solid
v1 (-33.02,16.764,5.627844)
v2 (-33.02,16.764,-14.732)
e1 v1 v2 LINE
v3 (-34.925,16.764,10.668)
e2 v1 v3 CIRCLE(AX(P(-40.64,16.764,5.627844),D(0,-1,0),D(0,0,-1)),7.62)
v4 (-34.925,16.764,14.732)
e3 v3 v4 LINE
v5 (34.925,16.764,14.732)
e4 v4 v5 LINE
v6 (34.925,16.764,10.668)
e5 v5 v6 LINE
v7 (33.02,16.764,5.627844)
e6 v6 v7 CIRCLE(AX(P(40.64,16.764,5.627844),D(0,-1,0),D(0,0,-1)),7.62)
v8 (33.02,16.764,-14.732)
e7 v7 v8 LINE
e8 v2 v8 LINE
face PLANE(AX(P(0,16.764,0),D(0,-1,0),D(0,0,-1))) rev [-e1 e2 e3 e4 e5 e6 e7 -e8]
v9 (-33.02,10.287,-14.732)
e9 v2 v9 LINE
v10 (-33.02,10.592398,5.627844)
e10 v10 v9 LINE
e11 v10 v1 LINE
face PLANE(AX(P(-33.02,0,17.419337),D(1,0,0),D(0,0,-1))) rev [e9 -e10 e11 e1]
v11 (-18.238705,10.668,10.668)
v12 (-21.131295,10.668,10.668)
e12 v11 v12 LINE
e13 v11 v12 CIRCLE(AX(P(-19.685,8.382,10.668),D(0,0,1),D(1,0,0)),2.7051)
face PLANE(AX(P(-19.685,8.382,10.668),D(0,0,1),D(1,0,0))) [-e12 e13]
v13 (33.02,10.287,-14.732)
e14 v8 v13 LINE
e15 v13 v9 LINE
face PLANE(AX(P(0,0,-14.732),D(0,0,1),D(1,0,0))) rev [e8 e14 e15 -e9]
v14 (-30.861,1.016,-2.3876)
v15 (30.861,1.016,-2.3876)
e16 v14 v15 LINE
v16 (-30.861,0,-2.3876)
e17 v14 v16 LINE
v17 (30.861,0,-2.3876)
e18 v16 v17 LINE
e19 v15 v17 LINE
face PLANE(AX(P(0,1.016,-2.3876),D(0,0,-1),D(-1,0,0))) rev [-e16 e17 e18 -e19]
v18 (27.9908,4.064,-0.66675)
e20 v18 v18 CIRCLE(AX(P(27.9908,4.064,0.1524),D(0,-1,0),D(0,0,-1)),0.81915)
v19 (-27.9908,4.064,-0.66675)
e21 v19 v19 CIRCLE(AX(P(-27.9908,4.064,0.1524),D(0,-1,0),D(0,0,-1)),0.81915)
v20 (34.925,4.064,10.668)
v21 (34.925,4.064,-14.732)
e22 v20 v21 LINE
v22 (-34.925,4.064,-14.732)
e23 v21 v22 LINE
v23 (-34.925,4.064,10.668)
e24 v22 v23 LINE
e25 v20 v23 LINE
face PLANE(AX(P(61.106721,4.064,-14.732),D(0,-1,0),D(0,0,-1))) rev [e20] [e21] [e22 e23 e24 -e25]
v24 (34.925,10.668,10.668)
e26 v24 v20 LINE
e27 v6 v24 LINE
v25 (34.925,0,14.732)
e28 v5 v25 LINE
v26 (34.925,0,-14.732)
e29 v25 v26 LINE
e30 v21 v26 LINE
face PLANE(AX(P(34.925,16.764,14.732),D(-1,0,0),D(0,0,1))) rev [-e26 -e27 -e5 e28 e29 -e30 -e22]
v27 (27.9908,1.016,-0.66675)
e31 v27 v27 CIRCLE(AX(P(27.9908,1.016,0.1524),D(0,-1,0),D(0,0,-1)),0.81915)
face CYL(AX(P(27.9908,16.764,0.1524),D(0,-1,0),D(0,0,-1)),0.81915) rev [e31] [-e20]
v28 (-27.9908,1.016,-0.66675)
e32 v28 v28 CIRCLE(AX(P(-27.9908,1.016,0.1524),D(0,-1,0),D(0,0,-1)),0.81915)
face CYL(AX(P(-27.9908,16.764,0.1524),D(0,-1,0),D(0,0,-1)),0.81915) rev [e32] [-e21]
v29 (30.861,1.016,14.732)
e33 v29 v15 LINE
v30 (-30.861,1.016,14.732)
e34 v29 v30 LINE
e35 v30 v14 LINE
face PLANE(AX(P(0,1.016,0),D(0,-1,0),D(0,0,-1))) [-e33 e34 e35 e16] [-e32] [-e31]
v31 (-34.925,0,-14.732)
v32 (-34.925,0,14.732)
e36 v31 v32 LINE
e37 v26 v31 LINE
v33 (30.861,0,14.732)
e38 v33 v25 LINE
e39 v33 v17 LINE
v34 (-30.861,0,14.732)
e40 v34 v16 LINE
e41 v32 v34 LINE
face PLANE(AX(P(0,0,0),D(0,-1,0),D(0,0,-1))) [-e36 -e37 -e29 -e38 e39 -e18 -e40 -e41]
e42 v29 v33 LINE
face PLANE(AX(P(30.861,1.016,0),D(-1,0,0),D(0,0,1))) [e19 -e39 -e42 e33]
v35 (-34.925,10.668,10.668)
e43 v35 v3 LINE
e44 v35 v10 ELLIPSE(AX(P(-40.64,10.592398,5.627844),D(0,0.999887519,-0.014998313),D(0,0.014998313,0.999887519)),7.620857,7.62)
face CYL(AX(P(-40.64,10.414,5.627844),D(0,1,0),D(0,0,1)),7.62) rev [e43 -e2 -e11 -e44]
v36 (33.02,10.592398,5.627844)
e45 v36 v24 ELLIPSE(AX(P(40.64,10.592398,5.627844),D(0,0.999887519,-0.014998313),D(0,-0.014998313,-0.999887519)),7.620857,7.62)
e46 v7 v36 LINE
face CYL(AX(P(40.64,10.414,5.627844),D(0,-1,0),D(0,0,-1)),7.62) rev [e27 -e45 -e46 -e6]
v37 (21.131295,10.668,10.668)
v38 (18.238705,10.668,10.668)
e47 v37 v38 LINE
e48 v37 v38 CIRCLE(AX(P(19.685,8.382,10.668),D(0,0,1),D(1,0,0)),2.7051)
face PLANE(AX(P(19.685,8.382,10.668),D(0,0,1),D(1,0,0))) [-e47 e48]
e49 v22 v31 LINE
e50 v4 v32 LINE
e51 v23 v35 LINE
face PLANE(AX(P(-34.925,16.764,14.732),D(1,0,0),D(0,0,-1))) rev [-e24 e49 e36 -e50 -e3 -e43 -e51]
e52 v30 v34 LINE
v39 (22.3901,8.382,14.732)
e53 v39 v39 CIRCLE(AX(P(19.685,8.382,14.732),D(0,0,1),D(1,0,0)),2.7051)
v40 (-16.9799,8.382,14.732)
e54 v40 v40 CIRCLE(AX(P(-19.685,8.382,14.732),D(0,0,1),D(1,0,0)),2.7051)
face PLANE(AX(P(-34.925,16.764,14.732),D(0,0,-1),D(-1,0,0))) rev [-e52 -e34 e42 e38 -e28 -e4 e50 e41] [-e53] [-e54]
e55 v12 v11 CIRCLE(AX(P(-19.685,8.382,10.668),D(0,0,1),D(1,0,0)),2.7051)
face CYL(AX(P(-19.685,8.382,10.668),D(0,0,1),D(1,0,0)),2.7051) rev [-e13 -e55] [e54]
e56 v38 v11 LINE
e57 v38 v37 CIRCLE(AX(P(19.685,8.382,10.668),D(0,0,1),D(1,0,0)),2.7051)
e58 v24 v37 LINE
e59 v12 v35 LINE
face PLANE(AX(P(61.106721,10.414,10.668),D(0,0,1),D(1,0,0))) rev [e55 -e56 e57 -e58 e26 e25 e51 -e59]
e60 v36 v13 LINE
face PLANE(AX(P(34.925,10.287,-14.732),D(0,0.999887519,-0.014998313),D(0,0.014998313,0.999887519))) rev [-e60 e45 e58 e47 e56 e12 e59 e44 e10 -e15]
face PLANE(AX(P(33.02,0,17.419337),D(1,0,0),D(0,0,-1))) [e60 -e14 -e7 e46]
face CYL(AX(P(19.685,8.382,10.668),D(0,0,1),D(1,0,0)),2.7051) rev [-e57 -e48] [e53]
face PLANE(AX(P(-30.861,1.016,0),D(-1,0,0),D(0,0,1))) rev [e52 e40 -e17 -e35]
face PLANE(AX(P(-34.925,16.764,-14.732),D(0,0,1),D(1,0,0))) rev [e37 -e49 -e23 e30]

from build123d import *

# Parameters (mm, degrees)
SKETCH1_W               = 69.85
SKETCH1_H               = 29.464
BOSS_EXTRUDE1_DEPTH     = 16.764
SKETCH2_W               = 25.4
SKETCH2_H               = 6.35
CUT_EXTRUDE1_DEPTH      = 69.85
SKETCH3_W               = 25.4
SKETCH3_H               = 6.35
CUT_EXTRUDE2_DEPTH      = 50.8
SKETCH5_W               = 61.722
SKETCH5_H               = 17.1196
CUT_EXTRUDE3_DEPTH      = 1.016
SKETCH5_3_R             = 0.81915
CUT_EXTRUDE4_DEPTH      = 42.446581825
SKETCH7_W               = 69.85
SKETCH7_H               = 7.62
BOSS_EXTRUDE2_DEPTH     = 25.4
CUT_EXTRUDE9_DEPTH      = 74.328616651
CUT_EXTRUDE9_DEPTH_BACK = 74.328616651
SKETCH13_R              = 2.7051
CUT_EXTRUDE12_DEPTH     = 4.064
SKETCH17_W              = 1.905
SKETCH17_H              = 6.477
CUT_EXTRUDE13_DEPTH     = 25.4
FILLET1_R               = 7.62


with BuildPart() as part:
    # Sketch1 → Boss-Extrude1 (new body)
    with BuildSketch(Plane(origin=(0, 0, 0), x_dir=(1, 0, 0), z_dir=(0, 1, 0))):
        Rectangle(SKETCH1_W, SKETCH1_H)
    extrude(amount=BOSS_EXTRUDE1_DEPTH)

    # Sketch2 → Cut-Extrude1 (cut)
    with BuildSketch(Plane.ZY.offset(34.925)):
        with Locations((-2.032, 7.239)):
            Rectangle(SKETCH2_W, SKETCH2_H)
    extrude(amount=-CUT_EXTRUDE1_DEPTH, mode=Mode.SUBTRACT)

    # Sketch3 → Cut-Extrude2 (cut)
    with BuildSketch(Plane.ZY.offset(34.925)):
        with Locations((-2.032, 13.589)):
            Rectangle(SKETCH3_W, SKETCH3_H)
    cut_extrude2 = extrude(amount=-CUT_EXTRUDE2_DEPTH, mode=Mode.SUBTRACT)

    # Mirror1: Cut-Extrude2 across plane
    add(cut_extrude2.mirror(Plane(origin=(0, 0, 0), x_dir=(0, 0, 1), z_dir=(1, 0, 0))), mode=Mode.SUBTRACT)

    # Sketch5 → Cut-Extrude3 (cut)
    with BuildSketch(Plane.XZ):
        with Locations((0, 6.1722)):
            Rectangle(SKETCH5_W, SKETCH5_H)
    extrude(amount=-CUT_EXTRUDE3_DEPTH, mode=Mode.SUBTRACT)

    # Sketch5<3> → Cut-Extrude4 (cut, through all)
    with BuildSketch(Plane.XZ):
        with Locations(Location((-27.9908, 0.1524, 0), (0, 0, 270))):
            Circle(SKETCH5_3_R)
        with Locations(Location((27.9908, 0.1524, 0), (0, 0, 270))):
            Circle(SKETCH5_3_R)
    extrude(amount=-CUT_EXTRUDE4_DEPTH, mode=Mode.SUBTRACT)

    # Sketch7 → Boss-Extrude2 (add)
    with BuildSketch(Plane(origin=(0, 0, 10.668), x_dir=(-1, 0, 0), z_dir=(0, 0, -1))):
        with Locations((0, 12.954)):
            Rectangle(SKETCH7_W, SKETCH7_H)
    extrude(amount=BOSS_EXTRUDE2_DEPTH)

    # Sketch8 → Cut-Extrude9 (cut, two sides: drawn at the far end of the back side and taken through both)
    with BuildSketch(Plane.ZY.offset(34.925).offset(-CUT_EXTRUDE9_DEPTH_BACK)):
        Polygon((-14.732, 10.287), (10.668, 10.668), (10.668, 9.144), (-14.732, 9.144), align=None)
    extrude(amount=CUT_EXTRUDE9_DEPTH + CUT_EXTRUDE9_DEPTH_BACK, mode=Mode.SUBTRACT)

    # Sketch13 → Cut-Extrude12 (cut)
    with BuildSketch(Plane.XY.offset(14.732)):
        with Locations((-19.685, 8.382)):
            Circle(SKETCH13_R)
        with Locations((19.685, 8.382)):
            Circle(SKETCH13_R)
    extrude(amount=-CUT_EXTRUDE12_DEPTH, mode=Mode.SUBTRACT)

    # Sketch17 → Cut-Extrude13 (cut)
    with BuildSketch(Plane(origin=(0, 0, -14.732), x_dir=(-1, 0, 0), z_dir=(0, 0, -1))):
        with Locations((-33.9725, 13.5255)):
            Rectangle(SKETCH17_W, SKETCH17_H)
        with Locations((33.9725, 13.5255)):
            Rectangle(SKETCH17_W, SKETCH17_H)
    extrude(amount=-CUT_EXTRUDE13_DEPTH, mode=Mode.SUBTRACT)

    # Fillet1
    # the kernel refuses this fillet: 7.62 mm, written as the material it adds along each edge
    with BuildSketch(Plane(origin=(-33.02, 16.764, 10.668), x_dir=(0, 0, -1), z_dir=(0, -1, 0))) as fillet1_piece_1_section:
        with BuildLine():
            CenterArc((5.040156248, -7.62), FILLET1_R, 90, 41.409622109)
            Line((0, -1.905), (-0.100803125, -1.7907))
            ThreePointArc((-0.100803125, -1.7907), (-0.1524, -0.9525), (-0.1524, 0))
            Line((-0.1524, 0), (0, 0.1524))
            Line((0, 0.1524), (5.040156248, 0.1524))
            Line((5.040156248, 0.1524), (5.040156248, 0))
        make_face()
    fillet1_piece_1 = extrude(amount=18.696390619, mode=Mode.PRIVATE)
    fillet1_piece_1 = split(fillet1_piece_1, bisect_by=Plane(origin=(-33.474653721, 10.647897951, 9.327863423), z_dir=(0, 0.9998875189808162, -0.014998312784712252)), keep=Keep.TOP, mode=Mode.PRIVATE)
    add(fillet1_piece_1)
    with BuildSketch(Plane(origin=(33.02, -1.932390619, 10.668), x_dir=(0, 0, -1), z_dir=(0, 1, 0))) as fillet1_piece_2_section:
        with BuildLine():
            CenterArc((5.040156248, -7.62), FILLET1_R, 90, 41.409622109)
            Line((0, -1.905), (-0.100803125, -1.7907))
            ThreePointArc((-0.100803125, -1.7907), (-0.1524, -0.9525), (-0.1524, 0))
            Line((-0.1524, 0), (0, 0.1524))
            Line((0, 0.1524), (5.040156248, 0.1524))
            Line((5.040156248, 0.1524), (5.040156248, 0))
        make_face()
    fillet1_piece_2 = extrude(amount=18.696390619, mode=Mode.PRIVATE)
    fillet1_piece_2 = split(fillet1_piece_2, bisect_by=Plane(origin=(33.474653721, 10.647897951, 9.327863423), z_dir=(0, 0.9998875189808162, -0.014998312784712252)), keep=Keep.TOP, mode=Mode.PRIVATE)
    add(fillet1_piece_2)


solid = part.part
